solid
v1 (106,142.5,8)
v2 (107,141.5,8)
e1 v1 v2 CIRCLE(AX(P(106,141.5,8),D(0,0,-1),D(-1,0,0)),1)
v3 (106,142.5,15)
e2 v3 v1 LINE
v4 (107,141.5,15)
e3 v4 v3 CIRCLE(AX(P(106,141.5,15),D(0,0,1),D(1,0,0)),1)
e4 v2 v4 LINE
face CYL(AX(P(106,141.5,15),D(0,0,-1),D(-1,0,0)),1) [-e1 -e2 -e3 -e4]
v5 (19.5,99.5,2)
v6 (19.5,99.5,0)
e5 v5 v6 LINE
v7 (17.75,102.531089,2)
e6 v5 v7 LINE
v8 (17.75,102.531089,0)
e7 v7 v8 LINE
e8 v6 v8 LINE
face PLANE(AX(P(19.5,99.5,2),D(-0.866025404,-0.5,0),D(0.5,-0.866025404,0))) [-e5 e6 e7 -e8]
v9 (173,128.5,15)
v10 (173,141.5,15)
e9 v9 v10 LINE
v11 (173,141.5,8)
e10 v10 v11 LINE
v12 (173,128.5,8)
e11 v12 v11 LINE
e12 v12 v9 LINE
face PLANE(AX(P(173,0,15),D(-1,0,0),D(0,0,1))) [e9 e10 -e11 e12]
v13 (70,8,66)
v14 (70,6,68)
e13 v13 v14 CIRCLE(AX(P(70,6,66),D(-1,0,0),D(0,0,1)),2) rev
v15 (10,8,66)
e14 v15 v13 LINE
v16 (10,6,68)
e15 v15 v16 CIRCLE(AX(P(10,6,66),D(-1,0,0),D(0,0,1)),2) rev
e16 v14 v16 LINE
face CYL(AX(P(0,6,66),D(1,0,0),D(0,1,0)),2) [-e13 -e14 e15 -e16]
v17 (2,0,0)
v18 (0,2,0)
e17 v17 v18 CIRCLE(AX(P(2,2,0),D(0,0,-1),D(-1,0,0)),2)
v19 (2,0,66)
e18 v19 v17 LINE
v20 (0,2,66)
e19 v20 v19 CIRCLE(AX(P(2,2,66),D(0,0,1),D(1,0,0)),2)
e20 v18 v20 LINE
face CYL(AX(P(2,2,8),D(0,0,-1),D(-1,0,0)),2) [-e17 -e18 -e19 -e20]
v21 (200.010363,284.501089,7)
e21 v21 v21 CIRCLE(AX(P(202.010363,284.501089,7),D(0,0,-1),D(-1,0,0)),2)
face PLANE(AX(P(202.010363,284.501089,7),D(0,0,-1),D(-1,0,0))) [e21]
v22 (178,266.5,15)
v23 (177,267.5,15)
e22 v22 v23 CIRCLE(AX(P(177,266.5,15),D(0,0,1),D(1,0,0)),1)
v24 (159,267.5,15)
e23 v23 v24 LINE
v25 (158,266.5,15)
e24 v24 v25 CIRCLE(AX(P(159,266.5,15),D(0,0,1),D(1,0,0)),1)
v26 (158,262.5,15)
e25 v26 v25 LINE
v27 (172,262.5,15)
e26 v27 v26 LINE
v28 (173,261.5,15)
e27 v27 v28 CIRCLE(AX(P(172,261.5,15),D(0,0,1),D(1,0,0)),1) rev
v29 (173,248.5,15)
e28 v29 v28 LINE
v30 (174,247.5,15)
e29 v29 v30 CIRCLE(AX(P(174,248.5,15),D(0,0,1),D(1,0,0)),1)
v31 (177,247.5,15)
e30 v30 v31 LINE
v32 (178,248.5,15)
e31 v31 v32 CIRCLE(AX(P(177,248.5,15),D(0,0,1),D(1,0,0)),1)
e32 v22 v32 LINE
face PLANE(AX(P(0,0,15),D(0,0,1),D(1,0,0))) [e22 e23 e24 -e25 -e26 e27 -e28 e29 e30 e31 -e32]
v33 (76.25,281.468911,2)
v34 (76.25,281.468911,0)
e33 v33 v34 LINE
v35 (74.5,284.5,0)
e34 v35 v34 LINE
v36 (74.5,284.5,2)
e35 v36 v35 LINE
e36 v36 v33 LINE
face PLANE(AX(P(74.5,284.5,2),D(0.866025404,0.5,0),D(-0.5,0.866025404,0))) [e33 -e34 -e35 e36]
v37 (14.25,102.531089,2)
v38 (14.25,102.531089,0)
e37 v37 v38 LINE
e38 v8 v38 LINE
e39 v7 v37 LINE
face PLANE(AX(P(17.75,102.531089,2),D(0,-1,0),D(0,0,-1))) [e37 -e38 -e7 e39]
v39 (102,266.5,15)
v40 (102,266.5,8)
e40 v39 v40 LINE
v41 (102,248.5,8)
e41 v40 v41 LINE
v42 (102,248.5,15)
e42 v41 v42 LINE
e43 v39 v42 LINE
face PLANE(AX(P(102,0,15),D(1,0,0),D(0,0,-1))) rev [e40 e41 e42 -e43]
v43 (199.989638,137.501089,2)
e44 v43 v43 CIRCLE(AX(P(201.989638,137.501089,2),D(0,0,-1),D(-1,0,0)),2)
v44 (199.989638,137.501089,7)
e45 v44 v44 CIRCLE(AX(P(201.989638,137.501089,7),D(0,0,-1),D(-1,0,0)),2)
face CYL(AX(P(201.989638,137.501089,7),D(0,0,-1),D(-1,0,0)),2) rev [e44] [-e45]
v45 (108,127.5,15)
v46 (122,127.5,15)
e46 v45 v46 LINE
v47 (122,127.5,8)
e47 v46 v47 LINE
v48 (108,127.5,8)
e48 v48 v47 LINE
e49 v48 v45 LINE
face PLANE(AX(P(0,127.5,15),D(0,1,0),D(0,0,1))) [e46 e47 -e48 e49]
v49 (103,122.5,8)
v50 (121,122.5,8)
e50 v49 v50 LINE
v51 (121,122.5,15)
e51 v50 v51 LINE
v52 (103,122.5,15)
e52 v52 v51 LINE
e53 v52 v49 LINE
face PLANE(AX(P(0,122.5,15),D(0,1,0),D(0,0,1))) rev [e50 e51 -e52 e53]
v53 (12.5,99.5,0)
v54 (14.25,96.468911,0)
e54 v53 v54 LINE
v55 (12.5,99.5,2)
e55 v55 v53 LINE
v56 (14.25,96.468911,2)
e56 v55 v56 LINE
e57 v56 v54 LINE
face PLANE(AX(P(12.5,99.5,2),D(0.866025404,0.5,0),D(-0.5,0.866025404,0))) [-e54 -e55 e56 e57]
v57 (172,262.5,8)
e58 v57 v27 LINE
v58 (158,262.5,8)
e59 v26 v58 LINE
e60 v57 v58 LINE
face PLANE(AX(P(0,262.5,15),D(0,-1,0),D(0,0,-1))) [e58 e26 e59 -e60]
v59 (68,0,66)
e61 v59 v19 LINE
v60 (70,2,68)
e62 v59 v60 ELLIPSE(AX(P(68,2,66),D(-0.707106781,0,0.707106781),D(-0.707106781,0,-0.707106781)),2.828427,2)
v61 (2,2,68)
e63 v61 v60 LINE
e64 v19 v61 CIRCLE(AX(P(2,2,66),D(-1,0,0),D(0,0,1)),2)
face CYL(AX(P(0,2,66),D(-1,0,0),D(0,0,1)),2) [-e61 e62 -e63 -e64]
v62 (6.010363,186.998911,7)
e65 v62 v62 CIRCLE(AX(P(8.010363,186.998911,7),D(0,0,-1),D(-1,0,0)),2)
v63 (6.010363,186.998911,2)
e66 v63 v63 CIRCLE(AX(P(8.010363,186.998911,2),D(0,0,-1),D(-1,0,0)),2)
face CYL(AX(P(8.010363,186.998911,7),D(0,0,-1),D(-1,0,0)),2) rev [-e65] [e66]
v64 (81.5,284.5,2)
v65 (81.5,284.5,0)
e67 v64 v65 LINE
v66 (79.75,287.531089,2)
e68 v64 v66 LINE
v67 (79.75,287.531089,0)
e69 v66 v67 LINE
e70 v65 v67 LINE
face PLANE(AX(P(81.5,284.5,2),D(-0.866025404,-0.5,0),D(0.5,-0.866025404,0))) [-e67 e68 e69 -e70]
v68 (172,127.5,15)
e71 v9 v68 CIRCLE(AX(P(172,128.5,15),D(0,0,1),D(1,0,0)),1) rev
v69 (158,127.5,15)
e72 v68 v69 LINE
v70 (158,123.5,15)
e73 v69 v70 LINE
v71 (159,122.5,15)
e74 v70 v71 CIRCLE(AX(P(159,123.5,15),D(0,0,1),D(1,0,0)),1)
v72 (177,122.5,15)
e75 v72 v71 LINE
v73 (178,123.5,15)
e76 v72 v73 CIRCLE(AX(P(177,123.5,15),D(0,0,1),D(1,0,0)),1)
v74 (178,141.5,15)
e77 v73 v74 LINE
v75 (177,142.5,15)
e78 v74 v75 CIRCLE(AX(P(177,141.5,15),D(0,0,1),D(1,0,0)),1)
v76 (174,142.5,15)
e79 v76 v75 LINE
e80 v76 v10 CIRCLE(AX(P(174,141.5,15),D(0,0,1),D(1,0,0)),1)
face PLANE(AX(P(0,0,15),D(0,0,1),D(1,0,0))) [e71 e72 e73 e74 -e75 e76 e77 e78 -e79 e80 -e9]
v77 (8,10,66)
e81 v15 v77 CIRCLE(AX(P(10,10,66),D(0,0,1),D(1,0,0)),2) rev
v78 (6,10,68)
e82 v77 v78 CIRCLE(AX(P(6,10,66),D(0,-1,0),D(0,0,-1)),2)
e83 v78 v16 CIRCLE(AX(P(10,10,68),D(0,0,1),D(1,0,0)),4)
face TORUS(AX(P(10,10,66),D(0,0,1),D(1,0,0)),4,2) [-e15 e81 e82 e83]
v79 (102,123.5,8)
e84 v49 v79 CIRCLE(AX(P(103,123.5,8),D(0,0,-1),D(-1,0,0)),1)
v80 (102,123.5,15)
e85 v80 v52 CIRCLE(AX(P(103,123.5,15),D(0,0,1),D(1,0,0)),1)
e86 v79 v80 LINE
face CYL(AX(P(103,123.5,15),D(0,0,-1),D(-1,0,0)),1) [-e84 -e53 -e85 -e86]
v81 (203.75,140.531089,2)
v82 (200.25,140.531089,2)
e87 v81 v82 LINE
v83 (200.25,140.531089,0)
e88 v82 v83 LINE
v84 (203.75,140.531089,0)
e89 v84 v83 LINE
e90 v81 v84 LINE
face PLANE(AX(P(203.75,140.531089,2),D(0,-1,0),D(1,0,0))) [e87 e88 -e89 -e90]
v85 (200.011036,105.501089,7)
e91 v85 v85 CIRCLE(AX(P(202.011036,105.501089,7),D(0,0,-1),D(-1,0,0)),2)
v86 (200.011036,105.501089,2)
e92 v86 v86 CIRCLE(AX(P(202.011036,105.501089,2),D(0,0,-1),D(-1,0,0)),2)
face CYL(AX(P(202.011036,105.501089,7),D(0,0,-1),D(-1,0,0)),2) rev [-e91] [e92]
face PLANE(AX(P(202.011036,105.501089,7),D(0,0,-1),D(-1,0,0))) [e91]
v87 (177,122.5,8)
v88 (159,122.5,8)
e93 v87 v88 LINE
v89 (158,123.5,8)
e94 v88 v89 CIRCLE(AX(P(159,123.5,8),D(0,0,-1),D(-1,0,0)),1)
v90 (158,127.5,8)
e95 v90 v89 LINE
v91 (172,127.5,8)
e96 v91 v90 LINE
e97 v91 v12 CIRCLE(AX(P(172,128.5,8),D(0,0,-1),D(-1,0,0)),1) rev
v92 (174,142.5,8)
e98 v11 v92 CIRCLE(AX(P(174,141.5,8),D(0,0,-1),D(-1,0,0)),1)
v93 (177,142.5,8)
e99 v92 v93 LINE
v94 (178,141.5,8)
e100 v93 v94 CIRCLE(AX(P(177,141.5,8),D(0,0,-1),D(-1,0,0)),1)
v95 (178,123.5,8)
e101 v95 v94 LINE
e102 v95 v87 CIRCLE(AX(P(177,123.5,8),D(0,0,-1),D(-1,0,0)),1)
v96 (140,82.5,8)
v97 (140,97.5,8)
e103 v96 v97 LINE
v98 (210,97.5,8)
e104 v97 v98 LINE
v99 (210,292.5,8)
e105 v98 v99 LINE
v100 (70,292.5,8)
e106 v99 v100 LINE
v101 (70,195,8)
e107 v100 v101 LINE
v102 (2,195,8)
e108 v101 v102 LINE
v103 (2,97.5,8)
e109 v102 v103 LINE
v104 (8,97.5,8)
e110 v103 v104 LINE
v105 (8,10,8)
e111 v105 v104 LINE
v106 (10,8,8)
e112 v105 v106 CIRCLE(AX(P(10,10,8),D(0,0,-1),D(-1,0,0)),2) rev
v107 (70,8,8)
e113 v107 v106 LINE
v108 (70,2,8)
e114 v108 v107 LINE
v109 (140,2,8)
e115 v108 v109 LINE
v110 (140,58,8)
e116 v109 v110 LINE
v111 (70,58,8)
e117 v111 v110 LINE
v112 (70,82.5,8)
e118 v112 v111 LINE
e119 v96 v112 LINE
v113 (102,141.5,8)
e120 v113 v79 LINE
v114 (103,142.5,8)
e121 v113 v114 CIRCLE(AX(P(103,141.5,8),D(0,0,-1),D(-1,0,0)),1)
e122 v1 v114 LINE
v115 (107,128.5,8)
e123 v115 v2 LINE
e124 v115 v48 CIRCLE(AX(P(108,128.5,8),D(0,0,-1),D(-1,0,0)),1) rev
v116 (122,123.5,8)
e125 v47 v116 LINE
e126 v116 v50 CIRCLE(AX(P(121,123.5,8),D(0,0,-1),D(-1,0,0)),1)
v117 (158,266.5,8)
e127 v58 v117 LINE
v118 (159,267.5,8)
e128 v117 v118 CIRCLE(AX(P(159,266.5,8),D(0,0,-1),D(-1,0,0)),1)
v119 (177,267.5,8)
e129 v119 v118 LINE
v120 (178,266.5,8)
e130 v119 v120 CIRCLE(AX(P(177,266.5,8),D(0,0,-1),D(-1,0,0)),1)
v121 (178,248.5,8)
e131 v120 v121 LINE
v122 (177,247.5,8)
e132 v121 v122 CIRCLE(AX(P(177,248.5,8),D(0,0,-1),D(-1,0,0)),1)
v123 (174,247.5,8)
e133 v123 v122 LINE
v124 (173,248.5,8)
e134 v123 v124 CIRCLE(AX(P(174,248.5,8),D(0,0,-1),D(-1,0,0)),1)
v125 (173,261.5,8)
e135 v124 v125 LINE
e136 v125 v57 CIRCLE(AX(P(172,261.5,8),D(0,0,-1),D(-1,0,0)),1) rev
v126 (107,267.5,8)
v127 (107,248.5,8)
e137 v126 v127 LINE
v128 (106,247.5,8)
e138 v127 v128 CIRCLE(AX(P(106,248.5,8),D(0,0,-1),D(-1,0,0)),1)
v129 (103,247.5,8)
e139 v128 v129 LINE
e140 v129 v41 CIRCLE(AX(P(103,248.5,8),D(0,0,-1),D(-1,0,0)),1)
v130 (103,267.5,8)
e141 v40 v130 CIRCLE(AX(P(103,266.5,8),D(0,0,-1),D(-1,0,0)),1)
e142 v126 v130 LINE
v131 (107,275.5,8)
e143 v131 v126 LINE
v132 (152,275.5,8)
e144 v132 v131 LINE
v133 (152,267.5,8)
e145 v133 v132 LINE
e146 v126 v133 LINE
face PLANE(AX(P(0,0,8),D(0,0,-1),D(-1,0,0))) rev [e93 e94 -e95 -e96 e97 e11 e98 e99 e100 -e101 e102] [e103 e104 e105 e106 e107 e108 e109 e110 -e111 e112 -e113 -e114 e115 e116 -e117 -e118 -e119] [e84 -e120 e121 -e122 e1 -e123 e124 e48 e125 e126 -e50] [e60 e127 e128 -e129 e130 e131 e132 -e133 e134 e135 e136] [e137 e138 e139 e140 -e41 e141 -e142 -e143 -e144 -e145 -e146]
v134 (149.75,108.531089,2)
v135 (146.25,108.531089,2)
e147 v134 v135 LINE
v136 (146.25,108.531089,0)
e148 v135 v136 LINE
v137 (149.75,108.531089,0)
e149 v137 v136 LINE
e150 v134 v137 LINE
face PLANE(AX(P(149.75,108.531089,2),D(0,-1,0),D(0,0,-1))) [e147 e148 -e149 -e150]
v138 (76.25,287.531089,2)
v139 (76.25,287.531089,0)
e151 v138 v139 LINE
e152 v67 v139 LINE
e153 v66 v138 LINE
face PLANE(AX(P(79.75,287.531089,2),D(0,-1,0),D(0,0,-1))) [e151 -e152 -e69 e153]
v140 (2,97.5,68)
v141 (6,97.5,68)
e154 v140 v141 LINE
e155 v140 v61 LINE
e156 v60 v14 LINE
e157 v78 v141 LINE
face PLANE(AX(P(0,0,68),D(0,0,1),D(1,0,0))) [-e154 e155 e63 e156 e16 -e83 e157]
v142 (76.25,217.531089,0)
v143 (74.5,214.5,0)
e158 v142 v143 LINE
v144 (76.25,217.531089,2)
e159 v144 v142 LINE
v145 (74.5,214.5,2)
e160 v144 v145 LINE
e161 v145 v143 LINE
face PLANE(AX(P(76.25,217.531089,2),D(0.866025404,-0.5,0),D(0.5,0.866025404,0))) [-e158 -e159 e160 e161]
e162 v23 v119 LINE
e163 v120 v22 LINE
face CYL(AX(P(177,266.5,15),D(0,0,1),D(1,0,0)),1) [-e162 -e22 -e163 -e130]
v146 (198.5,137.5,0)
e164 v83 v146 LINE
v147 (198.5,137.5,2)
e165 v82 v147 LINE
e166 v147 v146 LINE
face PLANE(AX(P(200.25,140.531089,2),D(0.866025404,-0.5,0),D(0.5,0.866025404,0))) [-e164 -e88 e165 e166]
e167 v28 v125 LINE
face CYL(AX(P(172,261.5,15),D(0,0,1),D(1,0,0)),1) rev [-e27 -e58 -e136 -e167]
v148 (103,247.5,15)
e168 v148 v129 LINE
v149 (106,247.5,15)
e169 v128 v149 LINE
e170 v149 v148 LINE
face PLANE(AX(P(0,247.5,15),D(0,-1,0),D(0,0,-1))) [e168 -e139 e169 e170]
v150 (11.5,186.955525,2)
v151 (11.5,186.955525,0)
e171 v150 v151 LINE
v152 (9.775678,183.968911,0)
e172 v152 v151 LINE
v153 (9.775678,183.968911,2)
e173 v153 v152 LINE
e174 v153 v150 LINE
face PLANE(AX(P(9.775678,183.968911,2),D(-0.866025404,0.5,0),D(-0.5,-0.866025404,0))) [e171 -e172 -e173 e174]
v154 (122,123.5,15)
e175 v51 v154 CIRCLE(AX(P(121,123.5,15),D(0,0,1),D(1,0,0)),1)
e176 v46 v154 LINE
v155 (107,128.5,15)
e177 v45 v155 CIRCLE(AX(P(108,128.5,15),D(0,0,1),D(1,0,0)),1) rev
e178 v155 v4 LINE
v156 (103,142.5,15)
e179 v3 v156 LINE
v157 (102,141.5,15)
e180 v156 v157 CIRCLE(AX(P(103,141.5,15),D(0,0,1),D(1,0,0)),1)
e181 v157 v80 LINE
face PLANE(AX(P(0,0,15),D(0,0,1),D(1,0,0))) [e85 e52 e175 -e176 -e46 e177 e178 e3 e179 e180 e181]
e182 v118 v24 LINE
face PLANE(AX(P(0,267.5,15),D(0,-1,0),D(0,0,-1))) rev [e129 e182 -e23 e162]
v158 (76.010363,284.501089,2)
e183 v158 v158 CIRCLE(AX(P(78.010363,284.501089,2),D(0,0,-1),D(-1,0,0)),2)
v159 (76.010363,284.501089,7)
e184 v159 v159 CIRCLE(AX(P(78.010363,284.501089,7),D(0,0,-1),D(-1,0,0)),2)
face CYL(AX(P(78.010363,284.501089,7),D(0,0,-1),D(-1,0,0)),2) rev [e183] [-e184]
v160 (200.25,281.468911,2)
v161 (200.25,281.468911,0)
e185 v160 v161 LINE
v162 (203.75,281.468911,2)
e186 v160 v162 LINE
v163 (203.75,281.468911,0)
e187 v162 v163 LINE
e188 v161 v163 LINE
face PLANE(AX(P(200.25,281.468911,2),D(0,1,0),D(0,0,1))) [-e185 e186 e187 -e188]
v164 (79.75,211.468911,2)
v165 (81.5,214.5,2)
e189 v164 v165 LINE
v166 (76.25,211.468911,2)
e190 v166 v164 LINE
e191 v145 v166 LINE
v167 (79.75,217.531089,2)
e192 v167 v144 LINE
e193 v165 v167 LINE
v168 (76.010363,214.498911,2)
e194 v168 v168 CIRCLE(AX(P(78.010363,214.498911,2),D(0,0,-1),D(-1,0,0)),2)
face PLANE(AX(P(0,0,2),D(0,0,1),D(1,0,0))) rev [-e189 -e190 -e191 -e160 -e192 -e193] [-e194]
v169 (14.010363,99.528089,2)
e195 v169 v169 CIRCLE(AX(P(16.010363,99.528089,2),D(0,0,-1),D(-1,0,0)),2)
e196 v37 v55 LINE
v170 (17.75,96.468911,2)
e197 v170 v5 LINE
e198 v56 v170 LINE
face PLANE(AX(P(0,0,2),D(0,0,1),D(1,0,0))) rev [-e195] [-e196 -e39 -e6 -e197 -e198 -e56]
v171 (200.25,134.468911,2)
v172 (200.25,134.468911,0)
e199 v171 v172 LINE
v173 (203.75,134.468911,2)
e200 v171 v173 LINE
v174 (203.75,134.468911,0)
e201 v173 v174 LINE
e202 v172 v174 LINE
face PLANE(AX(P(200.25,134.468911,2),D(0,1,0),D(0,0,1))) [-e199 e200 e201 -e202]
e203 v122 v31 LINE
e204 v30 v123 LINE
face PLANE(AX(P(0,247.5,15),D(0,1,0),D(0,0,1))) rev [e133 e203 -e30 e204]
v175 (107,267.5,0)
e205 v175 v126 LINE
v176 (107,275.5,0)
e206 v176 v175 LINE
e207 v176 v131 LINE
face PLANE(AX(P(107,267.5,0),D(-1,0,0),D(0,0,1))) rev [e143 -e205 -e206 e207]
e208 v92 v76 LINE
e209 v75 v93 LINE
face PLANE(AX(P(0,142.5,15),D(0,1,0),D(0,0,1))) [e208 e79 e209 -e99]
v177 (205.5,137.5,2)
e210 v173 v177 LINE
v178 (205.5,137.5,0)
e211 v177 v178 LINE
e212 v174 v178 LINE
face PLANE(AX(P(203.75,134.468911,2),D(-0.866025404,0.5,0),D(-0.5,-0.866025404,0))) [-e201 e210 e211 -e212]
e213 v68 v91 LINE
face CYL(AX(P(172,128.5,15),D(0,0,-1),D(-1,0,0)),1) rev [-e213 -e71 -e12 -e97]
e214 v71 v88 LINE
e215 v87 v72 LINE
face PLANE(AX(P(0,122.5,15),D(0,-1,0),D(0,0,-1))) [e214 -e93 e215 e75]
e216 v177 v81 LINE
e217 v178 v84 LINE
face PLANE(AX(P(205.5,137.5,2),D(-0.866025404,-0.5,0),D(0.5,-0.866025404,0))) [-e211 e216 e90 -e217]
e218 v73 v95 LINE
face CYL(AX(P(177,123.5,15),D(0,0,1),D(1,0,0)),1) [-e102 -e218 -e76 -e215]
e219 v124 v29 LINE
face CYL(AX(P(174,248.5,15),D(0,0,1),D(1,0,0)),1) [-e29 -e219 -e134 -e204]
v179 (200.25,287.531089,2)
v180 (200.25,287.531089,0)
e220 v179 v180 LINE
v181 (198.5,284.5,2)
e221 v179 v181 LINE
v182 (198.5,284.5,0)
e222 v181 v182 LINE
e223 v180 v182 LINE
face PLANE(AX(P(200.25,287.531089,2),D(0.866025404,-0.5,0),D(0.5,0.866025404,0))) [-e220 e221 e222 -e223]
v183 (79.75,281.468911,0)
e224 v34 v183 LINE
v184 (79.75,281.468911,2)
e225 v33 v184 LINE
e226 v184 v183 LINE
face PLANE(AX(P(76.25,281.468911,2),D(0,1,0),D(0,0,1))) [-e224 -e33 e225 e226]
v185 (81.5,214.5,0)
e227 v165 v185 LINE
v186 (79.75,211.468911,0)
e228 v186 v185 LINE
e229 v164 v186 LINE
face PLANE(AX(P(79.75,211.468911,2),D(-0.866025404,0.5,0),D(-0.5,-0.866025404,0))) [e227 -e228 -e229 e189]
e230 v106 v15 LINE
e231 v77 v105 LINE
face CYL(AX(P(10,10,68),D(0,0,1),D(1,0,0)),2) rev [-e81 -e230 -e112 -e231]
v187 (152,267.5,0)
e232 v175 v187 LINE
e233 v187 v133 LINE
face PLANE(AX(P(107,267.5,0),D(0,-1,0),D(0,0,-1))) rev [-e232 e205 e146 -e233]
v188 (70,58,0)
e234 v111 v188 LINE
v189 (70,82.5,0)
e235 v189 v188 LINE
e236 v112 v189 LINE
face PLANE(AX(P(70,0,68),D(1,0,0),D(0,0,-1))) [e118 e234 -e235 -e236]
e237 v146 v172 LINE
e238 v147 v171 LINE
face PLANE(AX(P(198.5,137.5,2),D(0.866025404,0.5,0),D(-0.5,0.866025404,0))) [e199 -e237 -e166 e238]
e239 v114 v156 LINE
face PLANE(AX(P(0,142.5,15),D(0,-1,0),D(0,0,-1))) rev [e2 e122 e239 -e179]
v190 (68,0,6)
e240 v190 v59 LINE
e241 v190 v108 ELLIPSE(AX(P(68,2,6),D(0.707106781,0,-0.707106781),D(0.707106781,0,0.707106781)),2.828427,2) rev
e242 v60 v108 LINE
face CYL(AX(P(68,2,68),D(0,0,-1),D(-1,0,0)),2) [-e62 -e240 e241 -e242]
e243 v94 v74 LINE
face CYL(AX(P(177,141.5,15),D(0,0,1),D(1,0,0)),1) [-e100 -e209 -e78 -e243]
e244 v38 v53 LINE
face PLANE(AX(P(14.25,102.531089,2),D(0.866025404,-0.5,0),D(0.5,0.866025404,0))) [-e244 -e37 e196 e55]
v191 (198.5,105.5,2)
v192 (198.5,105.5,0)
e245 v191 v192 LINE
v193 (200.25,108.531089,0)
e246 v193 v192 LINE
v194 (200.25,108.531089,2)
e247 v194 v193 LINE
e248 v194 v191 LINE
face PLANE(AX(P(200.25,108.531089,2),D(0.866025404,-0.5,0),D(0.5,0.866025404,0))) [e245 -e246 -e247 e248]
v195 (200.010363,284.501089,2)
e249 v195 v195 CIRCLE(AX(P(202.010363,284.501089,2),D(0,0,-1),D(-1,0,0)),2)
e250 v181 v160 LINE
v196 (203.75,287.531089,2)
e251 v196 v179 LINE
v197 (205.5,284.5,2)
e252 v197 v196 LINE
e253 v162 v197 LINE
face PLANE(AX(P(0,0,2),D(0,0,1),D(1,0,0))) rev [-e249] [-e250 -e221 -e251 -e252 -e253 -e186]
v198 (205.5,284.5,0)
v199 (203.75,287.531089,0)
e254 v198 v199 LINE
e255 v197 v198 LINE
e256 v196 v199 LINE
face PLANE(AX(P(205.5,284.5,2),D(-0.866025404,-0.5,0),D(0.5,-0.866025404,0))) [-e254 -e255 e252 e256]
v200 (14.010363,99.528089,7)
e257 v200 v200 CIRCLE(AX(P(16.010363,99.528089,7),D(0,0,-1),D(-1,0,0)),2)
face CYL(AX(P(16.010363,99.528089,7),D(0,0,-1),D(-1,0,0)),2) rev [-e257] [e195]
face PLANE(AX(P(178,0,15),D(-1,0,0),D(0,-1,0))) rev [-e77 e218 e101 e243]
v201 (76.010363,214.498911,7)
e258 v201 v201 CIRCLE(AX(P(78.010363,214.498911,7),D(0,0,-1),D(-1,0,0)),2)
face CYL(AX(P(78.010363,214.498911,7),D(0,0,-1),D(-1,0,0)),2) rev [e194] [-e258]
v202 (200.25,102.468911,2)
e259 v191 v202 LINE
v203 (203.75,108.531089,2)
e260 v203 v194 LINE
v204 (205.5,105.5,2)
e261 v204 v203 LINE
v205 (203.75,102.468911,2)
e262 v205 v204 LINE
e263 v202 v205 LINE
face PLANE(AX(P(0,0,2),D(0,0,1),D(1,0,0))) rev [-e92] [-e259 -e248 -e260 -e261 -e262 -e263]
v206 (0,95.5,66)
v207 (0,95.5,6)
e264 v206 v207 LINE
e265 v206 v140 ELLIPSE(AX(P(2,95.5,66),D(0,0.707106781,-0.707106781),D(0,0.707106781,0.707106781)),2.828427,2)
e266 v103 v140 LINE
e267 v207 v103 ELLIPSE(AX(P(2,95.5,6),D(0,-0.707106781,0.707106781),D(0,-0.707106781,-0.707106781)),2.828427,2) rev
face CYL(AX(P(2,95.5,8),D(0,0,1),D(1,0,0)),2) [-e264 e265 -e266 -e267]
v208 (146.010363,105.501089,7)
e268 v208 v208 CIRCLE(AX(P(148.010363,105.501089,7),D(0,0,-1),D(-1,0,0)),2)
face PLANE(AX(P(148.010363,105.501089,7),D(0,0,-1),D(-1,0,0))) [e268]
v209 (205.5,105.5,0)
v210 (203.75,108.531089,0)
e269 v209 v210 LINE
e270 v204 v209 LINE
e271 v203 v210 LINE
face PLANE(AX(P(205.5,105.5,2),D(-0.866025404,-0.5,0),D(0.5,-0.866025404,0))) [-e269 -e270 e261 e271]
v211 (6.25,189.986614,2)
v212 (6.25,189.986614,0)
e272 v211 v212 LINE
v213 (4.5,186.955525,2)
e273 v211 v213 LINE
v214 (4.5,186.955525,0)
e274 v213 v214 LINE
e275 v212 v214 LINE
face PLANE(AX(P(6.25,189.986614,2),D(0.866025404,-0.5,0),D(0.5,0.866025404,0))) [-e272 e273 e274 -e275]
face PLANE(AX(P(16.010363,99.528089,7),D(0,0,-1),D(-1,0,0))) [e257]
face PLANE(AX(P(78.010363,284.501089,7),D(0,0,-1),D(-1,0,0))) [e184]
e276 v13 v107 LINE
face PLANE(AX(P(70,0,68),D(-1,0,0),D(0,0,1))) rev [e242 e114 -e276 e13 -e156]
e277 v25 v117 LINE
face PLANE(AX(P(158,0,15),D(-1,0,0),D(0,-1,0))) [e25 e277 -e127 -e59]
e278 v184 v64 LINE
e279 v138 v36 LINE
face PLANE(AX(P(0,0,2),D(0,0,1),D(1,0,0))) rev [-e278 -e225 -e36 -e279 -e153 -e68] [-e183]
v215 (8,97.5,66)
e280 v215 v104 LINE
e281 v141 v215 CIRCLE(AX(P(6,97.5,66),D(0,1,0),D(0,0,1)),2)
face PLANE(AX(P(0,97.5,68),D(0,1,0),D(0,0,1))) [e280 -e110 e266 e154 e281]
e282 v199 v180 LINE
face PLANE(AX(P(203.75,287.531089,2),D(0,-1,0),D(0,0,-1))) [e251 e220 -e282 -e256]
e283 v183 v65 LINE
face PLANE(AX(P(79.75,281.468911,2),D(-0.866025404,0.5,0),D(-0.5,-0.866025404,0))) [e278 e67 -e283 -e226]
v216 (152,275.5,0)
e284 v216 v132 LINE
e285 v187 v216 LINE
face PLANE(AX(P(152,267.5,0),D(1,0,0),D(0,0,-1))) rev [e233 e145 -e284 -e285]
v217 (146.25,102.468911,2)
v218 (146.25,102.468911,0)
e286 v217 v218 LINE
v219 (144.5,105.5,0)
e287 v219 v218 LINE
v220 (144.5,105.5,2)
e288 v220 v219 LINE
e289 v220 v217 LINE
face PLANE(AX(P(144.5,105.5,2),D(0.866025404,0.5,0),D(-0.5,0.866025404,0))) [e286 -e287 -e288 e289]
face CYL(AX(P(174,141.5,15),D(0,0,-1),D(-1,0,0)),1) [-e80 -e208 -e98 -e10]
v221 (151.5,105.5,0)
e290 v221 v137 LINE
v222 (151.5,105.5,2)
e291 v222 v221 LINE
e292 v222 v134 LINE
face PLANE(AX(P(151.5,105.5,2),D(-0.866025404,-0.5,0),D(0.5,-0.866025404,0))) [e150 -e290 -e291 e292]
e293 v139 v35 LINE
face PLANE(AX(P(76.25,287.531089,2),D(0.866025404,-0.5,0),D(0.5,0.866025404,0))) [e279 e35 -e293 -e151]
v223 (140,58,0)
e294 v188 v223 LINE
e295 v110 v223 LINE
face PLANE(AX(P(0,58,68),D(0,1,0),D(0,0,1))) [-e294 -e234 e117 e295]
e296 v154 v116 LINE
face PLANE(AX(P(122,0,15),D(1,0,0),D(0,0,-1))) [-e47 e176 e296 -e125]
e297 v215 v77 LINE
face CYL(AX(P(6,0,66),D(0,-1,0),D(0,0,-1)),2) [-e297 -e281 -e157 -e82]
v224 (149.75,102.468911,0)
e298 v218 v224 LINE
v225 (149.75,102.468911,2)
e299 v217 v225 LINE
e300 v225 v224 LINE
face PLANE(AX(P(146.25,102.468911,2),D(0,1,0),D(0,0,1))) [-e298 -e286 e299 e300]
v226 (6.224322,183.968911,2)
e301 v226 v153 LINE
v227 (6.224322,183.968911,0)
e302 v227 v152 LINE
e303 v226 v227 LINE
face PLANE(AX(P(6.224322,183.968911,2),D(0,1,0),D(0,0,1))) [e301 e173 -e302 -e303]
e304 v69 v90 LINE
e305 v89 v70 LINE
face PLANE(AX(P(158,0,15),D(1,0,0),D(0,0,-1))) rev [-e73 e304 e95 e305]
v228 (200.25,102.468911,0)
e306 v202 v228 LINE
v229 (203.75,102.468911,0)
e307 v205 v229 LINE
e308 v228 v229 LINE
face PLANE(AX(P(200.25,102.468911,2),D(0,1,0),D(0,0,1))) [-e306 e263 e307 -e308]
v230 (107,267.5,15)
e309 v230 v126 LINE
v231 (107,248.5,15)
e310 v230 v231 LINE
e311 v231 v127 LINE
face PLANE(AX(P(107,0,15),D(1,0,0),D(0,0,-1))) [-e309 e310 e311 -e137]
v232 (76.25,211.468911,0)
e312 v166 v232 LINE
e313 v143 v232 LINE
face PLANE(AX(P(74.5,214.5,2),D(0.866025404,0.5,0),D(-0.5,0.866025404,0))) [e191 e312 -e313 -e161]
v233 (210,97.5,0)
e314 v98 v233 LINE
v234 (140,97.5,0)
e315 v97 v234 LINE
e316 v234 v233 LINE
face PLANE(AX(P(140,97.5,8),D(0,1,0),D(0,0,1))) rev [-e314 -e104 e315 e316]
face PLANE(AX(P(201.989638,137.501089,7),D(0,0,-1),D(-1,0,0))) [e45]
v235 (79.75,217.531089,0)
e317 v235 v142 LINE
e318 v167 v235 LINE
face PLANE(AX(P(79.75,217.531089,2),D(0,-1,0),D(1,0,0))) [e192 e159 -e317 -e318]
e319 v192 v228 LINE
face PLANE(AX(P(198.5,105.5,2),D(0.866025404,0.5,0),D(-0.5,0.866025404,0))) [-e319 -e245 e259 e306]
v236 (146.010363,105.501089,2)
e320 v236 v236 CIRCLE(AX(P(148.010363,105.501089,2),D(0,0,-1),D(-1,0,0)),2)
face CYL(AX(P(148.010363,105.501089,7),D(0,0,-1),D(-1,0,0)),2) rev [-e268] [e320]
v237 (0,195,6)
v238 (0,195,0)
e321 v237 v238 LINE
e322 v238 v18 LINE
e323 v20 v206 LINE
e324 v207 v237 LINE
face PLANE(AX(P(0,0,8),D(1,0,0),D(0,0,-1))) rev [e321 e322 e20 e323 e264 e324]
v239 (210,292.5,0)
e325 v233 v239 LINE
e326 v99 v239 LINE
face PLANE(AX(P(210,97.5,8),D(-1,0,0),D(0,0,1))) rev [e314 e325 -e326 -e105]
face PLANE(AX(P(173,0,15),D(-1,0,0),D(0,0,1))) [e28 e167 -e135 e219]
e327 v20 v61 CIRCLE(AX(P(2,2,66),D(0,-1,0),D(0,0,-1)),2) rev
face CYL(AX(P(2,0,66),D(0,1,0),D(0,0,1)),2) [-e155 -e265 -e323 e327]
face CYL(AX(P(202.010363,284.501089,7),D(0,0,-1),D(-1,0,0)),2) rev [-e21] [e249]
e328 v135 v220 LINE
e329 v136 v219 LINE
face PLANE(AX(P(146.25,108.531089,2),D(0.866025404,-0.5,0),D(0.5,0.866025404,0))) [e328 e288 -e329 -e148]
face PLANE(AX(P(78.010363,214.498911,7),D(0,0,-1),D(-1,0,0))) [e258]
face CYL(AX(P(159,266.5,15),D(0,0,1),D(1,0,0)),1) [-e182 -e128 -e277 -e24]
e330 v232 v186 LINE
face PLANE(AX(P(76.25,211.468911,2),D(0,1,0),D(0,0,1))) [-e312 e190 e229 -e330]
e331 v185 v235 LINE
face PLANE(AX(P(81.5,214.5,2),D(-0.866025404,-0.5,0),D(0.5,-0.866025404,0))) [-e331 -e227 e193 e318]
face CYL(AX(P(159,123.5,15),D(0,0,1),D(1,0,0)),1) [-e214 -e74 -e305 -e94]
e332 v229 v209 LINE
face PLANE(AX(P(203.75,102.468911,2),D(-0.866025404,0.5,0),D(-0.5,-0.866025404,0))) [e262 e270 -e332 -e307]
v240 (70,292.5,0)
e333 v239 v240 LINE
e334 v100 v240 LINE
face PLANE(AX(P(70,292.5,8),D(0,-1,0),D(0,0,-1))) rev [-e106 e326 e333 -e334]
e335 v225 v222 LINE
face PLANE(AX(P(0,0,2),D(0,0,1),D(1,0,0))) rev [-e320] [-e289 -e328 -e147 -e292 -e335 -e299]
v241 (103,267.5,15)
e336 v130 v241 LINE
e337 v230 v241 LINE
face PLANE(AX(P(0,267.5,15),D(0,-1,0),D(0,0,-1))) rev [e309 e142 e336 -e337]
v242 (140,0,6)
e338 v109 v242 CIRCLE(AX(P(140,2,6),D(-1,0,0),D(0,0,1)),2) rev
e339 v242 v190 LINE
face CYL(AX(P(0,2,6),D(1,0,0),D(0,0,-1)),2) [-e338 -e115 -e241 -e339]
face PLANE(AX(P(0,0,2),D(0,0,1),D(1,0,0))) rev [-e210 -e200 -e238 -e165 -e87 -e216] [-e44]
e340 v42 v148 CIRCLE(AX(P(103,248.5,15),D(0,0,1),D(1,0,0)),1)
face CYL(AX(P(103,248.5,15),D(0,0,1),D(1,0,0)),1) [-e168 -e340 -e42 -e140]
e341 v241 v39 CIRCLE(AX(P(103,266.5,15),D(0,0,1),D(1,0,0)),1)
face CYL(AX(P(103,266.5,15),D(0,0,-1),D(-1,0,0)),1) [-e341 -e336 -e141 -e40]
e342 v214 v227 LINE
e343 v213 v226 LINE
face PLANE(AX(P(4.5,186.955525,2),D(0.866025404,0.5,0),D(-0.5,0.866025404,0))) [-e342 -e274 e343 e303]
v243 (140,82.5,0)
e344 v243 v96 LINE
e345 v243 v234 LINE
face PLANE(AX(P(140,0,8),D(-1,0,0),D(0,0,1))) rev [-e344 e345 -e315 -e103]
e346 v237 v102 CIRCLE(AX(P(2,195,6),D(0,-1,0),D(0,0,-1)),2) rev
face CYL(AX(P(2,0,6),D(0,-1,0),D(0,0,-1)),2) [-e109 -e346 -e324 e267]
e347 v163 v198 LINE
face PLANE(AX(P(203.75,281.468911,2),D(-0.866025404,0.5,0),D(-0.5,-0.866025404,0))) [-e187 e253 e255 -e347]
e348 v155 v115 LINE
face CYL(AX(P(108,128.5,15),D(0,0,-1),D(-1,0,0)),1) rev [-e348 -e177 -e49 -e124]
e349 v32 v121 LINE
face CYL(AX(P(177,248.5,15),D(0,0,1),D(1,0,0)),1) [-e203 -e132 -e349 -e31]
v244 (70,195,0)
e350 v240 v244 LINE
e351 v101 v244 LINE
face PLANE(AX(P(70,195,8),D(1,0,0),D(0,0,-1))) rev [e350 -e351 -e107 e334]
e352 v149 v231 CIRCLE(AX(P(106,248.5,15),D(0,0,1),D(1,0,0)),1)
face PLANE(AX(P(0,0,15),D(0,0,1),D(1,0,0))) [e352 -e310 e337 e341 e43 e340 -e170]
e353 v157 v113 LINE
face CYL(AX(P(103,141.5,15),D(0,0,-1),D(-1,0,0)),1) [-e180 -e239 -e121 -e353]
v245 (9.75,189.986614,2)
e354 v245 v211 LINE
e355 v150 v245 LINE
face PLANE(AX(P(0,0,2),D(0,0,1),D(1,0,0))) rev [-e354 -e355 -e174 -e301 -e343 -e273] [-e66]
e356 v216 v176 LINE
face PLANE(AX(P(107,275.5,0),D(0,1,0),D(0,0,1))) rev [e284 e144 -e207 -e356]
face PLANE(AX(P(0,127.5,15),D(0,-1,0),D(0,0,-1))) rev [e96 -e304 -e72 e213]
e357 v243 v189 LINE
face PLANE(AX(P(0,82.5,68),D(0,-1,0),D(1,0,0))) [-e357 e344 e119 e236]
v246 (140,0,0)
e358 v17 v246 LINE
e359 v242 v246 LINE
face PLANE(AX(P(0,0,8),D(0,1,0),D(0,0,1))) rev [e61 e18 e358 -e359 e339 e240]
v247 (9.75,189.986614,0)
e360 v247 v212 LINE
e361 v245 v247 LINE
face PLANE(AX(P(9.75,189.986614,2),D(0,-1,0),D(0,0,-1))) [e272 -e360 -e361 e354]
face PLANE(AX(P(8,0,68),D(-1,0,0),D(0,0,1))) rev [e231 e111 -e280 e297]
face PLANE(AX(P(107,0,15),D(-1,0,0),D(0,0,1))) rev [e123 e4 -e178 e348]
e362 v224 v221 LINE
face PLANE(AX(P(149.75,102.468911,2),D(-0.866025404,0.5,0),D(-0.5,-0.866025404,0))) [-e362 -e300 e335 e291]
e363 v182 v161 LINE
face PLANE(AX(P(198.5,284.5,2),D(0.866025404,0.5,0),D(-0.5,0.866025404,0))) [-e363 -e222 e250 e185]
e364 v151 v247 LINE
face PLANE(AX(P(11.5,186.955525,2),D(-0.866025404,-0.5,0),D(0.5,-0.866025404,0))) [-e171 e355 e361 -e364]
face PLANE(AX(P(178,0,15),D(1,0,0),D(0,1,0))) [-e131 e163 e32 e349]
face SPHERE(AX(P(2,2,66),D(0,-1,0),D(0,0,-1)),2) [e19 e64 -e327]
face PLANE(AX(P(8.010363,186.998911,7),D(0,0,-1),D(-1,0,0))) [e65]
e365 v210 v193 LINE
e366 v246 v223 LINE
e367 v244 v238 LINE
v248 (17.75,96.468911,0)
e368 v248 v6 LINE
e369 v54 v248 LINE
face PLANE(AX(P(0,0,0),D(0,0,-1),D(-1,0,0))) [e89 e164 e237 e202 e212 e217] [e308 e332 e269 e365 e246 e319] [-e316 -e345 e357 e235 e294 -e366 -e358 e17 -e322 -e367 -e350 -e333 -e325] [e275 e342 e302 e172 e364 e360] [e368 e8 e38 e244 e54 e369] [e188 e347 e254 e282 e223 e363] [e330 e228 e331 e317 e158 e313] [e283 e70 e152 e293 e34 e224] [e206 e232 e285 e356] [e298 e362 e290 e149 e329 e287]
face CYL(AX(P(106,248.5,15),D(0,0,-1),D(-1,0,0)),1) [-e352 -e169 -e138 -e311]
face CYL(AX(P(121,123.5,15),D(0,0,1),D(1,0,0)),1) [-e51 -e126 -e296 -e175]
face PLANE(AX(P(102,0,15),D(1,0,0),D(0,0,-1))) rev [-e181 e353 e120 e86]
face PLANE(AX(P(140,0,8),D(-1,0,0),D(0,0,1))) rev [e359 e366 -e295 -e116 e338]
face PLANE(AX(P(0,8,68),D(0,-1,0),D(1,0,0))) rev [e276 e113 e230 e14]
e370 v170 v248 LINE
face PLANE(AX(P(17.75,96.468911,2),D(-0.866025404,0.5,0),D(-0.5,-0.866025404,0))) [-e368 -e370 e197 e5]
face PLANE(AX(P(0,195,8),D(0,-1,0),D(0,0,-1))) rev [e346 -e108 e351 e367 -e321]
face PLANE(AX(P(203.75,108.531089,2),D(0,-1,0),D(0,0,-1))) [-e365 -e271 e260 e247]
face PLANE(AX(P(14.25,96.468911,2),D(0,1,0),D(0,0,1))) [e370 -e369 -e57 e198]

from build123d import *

# Parameters (mm, degrees)
EXTRUDE_1_DEPTH         = 8
CUT_EXTRUDE_1_DEPTH     = 2
SKETCH_3_R              = 2
CUT_EXTRUDE_2_DEPTH     = 5
SKETCH_4_W              = 62
SKETCH_4_H              = 8
EXTRUDE_2_DEPTH         = 60
FILLET_1_R              = 2
SKETCH_5_W              = 5
SKETCH_5_H              = 20
SKETCH_5_W_2            = 15
SKETCH_5_H_2            = 5
SKETCH_5_H_3            = 15
EXTRUDE_4_DEPTH         = 7
SKETCH_6_W              = 45
SKETCH_6_H              = 8
CUT_EXTRUDE_3_DEPTH     = 366.042805709
CUT_EXTRUDE_START       = -8
CUT_EXTRUDE_4_OUTLINE_W = 70
CUT_EXTRUDE_4_OUTLINE_H = 24.5
CUT_EXTRUDE_4_DEPTH     = 8
CUT_EXTRUDE_4_2_DEPTH   = 7
CUT_EXTRUDE_4_3_DEPTH   = 7


# Read off the part's stored shape, not the designer's step: 컷-돌출4
with BuildPart() as part:
    # 스케치1 → 보스-돌출1 (new body)
    with BuildSketch(Plane.XY):
        Polygon((0, 0), (140, 0), (140, 97.5), (210, 97.5), (210, 292.5), (70, 292.5), (70, 195), (0, 195), align=None)
    extrude(amount=EXTRUDE_1_DEPTH)

    # 스케치2 → 컷-돌출1 (cut)
    with BuildSketch(Plane.XY):
        Polygon((200.25, 287.531088913), (198.5, 284.5), (200.25, 281.468911087), (203.75, 281.468911087), (205.5, 284.5), (203.75, 287.531088913), align=None)
        Polygon((76.25, 287.531088913), (74.5, 284.5), (76.25, 281.468911087), (79.75, 281.468911087), (81.5, 284.5), (79.75, 287.531088913), align=None)
        Polygon((6.25, 189.986613874), (4.5, 186.955524961), (6.224322324, 183.968911087), (9.775677676, 183.968911087), (11.5, 186.955524961), (9.75, 189.986613874), align=None)
        Polygon((76.25, 217.531088913), (74.5, 214.5), (76.25, 211.468911087), (79.75, 211.468911087), (81.5, 214.5), (79.75, 217.531088913), align=None)
        Polygon((200.25, 140.531088913), (198.5, 137.5), (200.25, 134.468911087), (203.75, 134.468911087), (205.5, 137.5), (203.75, 140.531088913), align=None)
        Polygon((200.25, 108.531088913), (198.5, 105.5), (200.25, 102.468911087), (203.75, 102.468911087), (205.5, 105.5), (203.75, 108.531088913), align=None)
        Polygon((144.5, 105.5), (146.25, 102.468911087), (149.75, 102.468911087), (151.5, 105.5), (149.75, 108.531088913), (146.25, 108.531088913), align=None)
        Polygon((14.25, 102.531088913), (12.5, 99.5), (14.25, 96.468911087), (17.75, 96.468911087), (19.5, 99.5), (17.75, 102.531088913), align=None)
    extrude(amount=CUT_EXTRUDE_1_DEPTH, mode=Mode.SUBTRACT)

    # 스케치3 → 컷-돌출2 (cut)
    with BuildSketch(Plane(origin=(0, 0, 2), x_dir=(-1, 0, 0), z_dir=(0, 0, -1))):
        with Locations((-202.01036292, 284.501088913)):
            Circle(SKETCH_3_R)
        with Locations((-78.01036292, 284.501088913)):
            Circle(SKETCH_3_R)
        with Locations((-78.01036292, 214.498911087)):
            Circle(SKETCH_3_R)
        with Locations((-8.01036292, 186.998911087)):
            Circle(SKETCH_3_R)
        with Locations((-201.989637708, 137.501088913)):
            Circle(SKETCH_3_R)
        with Locations((-202.011036292, 105.501088913)):
            Circle(SKETCH_3_R)
        with Locations((-148.01036292, 105.501088913)):
            Circle(SKETCH_3_R)
        with Locations((-16.01036292, 99.528088913)):
            Circle(SKETCH_3_R)
    extrude(amount=-CUT_EXTRUDE_2_DEPTH, mode=Mode.SUBTRACT)

    # 스케치4 → 보스-돌출2 (add)
    with BuildSketch(Plane.XY.offset(8)):
        Polygon((0, 97.5), (0, 0), (8, 0), (8, 8), (8, 97.5), align=None)
        with Locations((39, 4)):
            Rectangle(SKETCH_4_W, SKETCH_4_H)
    extrude(amount=EXTRUDE_2_DEPTH)

    # 필렛1
    fillet_1_edges = [part.edges().sort_by_distance(p)[0] for p in [
        (0, 0, 34),
        (105, 0, 8),
        (70, 0, 38),
        (8, 8, 38),
        (0, 97.5, 38),
        (35, 0, 68),
        (39, 8, 68),
        (8, 52.75, 68),
        (0, 48.75, 68),
        (0, 146.25, 8),
    ]]
    fillet(fillet_1_edges, radius=FILLET_1_R)

    # 스케치5 → 보스-돌출4 (add)
    with BuildSketch(Plane.XY.offset(8)):
        with Locations((104.5, 257.5)):
            Rectangle(SKETCH_5_W, SKETCH_5_H)
        with Locations((165.5, 265)):
            Rectangle(SKETCH_5_W_2, SKETCH_5_H_2)
        Polygon((173, 267.5), (173, 262.5), (173, 247.5), (178, 247.5), (178, 267.5), align=None)
        Polygon((122, 127.5), (107, 127.5), (102, 127.5), (102, 122.5), (122, 122.5), align=None)
        with Locations((104.5, 135)):
            Rectangle(SKETCH_5_W, SKETCH_5_H_3)
        with Locations((165.5, 125)):
            Rectangle(SKETCH_5_W_2, SKETCH_5_H_2)
        Polygon((173, 142.5), (173, 127.5), (173, 122.5), (178, 122.5), (178, 142.5), align=None)
    extrude(amount=EXTRUDE_4_DEPTH)

    # 스케치6 → 컷-돌출3 (cut, through all)
    with BuildSketch(Plane.XY.offset(8)):
        with Locations((129.5, 271.5)):
            Rectangle(SKETCH_6_W, SKETCH_6_H)
    extrude(amount=-CUT_EXTRUDE_3_DEPTH, mode=Mode.SUBTRACT)

    # 컷-돌출4 outline → 컷-돌출4 (cut)
    with BuildSketch(Plane.XY.offset(8).offset(CUT_EXTRUDE_START)):
        with Locations((105, 70.25)):
            Rectangle(CUT_EXTRUDE_4_OUTLINE_W, CUT_EXTRUDE_4_OUTLINE_H)
    extrude(amount=CUT_EXTRUDE_4_DEPTH, mode=Mode.SUBTRACT)

    # Cut-Extrude 4 2 outline → Cut-Extrude 4 2 (cut)
    with BuildSketch(Plane.XY.offset(8)):
        with BuildLine():
            Line((173, 142.5), (173, 141.5))
            ThreePointArc((173, 141.5), (173.292893219, 142.207106781), (174, 142.5))
            Line((174, 142.5), (173, 142.5))
        make_face()
        with BuildLine():
            Line((178, 142.5), (177, 142.5))
            ThreePointArc((177, 142.5), (177.707106781, 142.207106781), (178, 141.5))
            Line((178, 141.5), (178, 142.5))
        make_face()
        with BuildLine():
            Line((178, 122.5), (178, 123.5))
            ThreePointArc((178, 123.5), (177.707106781, 122.792893219), (177, 122.5))
            Line((177, 122.5), (178, 122.5))
        make_face()
        with BuildLine():
            ThreePointArc((159, 122.5), (158.292893219, 122.792893219), (158, 123.5))
            Line((158, 123.5), (158, 122.5))
            Line((158, 122.5), (159, 122.5))
        make_face()
        with BuildLine():
            Line((107, 142.5), (106, 142.5))
            ThreePointArc((106, 142.5), (106.707106781, 142.207106781), (107, 141.5))
            Line((107, 141.5), (107, 142.5))
        make_face()
        with BuildLine():
            ThreePointArc((102, 141.5), (102.292893219, 142.207106781), (103, 142.5))
            Line((103, 142.5), (102, 142.5))
            Line((102, 142.5), (102, 141.5))
        make_face()
        with BuildLine():
            ThreePointArc((103, 122.5), (102.292893219, 122.792893219), (102, 123.5))
            Line((102, 123.5), (102, 122.5))
            Line((102, 122.5), (103, 122.5))
        make_face()
        with BuildLine():
            Line((122, 122.5), (122, 123.5))
            ThreePointArc((122, 123.5), (121.707106781, 122.792893219), (121, 122.5))
            Line((121, 122.5), (122, 122.5))
        make_face()
        with BuildLine():
            Line((107, 247.5), (107, 248.5))
            ThreePointArc((107, 248.5), (106.707106781, 247.792893219), (106, 247.5))
            Line((106, 247.5), (107, 247.5))
        make_face()
        with BuildLine():
            Line((102, 247.5), (103, 247.5))
            ThreePointArc((103, 247.5), (102.292893219, 247.792893219), (102, 248.5))
            Line((102, 248.5), (102, 247.5))
        make_face()
        with BuildLine():
            ThreePointArc((102, 266.5), (102.292893219, 267.207106781), (103, 267.5))
            Line((103, 267.5), (102, 267.5))
            Line((102, 267.5), (102, 266.5))
        make_face()
        with BuildLine():
            ThreePointArc((174, 247.5), (173.292893219, 247.792893219), (173, 248.5))
            Line((173, 248.5), (173, 247.5))
            Line((173, 247.5), (174, 247.5))
        make_face()
        with BuildLine():
            ThreePointArc((178, 248.5), (177.707106781, 247.792893219), (177, 247.5))
            Line((177, 247.5), (178, 247.5))
            Line((178, 247.5), (178, 248.5))
        make_face()
        with BuildLine():
            ThreePointArc((177, 267.5), (177.707106781, 267.207106781), (178, 266.5))
            Line((178, 266.5), (178, 267.5))
            Line((178, 267.5), (177, 267.5))
        make_face()
        with BuildLine():
            Line((158, 267.5), (158, 266.5))
            ThreePointArc((158, 266.5), (158.292893219, 267.207106781), (159, 267.5))
            Line((159, 267.5), (158, 267.5))
        make_face()
    extrude(amount=CUT_EXTRUDE_4_2_DEPTH, mode=Mode.SUBTRACT)

    # Cut-Extrude 4 3 outline → Cut-Extrude 4 3 (add)
    with BuildSketch(Plane.XY.offset(8)):
        with BuildLine():
            Line((173, 127.5), (173, 128.5))
            ThreePointArc((173, 128.5), (172.707106781, 127.792893219), (172, 127.5))
            Line((172, 127.5), (173, 127.5))
        make_face()
        with BuildLine():
            ThreePointArc((108, 127.5), (107.292893219, 127.792893219), (107, 128.5))
            Line((107, 128.5), (107, 127.5))
            Line((107, 127.5), (108, 127.5))
        make_face()
        with BuildLine():
            ThreePointArc((172, 262.5), (172.707106781, 262.207106781), (173, 261.5))
            Line((173, 261.5), (173, 262.5))
            Line((173, 262.5), (172, 262.5))
        make_face()
    extrude(amount=CUT_EXTRUDE_4_3_DEPTH)


solid = part.part
